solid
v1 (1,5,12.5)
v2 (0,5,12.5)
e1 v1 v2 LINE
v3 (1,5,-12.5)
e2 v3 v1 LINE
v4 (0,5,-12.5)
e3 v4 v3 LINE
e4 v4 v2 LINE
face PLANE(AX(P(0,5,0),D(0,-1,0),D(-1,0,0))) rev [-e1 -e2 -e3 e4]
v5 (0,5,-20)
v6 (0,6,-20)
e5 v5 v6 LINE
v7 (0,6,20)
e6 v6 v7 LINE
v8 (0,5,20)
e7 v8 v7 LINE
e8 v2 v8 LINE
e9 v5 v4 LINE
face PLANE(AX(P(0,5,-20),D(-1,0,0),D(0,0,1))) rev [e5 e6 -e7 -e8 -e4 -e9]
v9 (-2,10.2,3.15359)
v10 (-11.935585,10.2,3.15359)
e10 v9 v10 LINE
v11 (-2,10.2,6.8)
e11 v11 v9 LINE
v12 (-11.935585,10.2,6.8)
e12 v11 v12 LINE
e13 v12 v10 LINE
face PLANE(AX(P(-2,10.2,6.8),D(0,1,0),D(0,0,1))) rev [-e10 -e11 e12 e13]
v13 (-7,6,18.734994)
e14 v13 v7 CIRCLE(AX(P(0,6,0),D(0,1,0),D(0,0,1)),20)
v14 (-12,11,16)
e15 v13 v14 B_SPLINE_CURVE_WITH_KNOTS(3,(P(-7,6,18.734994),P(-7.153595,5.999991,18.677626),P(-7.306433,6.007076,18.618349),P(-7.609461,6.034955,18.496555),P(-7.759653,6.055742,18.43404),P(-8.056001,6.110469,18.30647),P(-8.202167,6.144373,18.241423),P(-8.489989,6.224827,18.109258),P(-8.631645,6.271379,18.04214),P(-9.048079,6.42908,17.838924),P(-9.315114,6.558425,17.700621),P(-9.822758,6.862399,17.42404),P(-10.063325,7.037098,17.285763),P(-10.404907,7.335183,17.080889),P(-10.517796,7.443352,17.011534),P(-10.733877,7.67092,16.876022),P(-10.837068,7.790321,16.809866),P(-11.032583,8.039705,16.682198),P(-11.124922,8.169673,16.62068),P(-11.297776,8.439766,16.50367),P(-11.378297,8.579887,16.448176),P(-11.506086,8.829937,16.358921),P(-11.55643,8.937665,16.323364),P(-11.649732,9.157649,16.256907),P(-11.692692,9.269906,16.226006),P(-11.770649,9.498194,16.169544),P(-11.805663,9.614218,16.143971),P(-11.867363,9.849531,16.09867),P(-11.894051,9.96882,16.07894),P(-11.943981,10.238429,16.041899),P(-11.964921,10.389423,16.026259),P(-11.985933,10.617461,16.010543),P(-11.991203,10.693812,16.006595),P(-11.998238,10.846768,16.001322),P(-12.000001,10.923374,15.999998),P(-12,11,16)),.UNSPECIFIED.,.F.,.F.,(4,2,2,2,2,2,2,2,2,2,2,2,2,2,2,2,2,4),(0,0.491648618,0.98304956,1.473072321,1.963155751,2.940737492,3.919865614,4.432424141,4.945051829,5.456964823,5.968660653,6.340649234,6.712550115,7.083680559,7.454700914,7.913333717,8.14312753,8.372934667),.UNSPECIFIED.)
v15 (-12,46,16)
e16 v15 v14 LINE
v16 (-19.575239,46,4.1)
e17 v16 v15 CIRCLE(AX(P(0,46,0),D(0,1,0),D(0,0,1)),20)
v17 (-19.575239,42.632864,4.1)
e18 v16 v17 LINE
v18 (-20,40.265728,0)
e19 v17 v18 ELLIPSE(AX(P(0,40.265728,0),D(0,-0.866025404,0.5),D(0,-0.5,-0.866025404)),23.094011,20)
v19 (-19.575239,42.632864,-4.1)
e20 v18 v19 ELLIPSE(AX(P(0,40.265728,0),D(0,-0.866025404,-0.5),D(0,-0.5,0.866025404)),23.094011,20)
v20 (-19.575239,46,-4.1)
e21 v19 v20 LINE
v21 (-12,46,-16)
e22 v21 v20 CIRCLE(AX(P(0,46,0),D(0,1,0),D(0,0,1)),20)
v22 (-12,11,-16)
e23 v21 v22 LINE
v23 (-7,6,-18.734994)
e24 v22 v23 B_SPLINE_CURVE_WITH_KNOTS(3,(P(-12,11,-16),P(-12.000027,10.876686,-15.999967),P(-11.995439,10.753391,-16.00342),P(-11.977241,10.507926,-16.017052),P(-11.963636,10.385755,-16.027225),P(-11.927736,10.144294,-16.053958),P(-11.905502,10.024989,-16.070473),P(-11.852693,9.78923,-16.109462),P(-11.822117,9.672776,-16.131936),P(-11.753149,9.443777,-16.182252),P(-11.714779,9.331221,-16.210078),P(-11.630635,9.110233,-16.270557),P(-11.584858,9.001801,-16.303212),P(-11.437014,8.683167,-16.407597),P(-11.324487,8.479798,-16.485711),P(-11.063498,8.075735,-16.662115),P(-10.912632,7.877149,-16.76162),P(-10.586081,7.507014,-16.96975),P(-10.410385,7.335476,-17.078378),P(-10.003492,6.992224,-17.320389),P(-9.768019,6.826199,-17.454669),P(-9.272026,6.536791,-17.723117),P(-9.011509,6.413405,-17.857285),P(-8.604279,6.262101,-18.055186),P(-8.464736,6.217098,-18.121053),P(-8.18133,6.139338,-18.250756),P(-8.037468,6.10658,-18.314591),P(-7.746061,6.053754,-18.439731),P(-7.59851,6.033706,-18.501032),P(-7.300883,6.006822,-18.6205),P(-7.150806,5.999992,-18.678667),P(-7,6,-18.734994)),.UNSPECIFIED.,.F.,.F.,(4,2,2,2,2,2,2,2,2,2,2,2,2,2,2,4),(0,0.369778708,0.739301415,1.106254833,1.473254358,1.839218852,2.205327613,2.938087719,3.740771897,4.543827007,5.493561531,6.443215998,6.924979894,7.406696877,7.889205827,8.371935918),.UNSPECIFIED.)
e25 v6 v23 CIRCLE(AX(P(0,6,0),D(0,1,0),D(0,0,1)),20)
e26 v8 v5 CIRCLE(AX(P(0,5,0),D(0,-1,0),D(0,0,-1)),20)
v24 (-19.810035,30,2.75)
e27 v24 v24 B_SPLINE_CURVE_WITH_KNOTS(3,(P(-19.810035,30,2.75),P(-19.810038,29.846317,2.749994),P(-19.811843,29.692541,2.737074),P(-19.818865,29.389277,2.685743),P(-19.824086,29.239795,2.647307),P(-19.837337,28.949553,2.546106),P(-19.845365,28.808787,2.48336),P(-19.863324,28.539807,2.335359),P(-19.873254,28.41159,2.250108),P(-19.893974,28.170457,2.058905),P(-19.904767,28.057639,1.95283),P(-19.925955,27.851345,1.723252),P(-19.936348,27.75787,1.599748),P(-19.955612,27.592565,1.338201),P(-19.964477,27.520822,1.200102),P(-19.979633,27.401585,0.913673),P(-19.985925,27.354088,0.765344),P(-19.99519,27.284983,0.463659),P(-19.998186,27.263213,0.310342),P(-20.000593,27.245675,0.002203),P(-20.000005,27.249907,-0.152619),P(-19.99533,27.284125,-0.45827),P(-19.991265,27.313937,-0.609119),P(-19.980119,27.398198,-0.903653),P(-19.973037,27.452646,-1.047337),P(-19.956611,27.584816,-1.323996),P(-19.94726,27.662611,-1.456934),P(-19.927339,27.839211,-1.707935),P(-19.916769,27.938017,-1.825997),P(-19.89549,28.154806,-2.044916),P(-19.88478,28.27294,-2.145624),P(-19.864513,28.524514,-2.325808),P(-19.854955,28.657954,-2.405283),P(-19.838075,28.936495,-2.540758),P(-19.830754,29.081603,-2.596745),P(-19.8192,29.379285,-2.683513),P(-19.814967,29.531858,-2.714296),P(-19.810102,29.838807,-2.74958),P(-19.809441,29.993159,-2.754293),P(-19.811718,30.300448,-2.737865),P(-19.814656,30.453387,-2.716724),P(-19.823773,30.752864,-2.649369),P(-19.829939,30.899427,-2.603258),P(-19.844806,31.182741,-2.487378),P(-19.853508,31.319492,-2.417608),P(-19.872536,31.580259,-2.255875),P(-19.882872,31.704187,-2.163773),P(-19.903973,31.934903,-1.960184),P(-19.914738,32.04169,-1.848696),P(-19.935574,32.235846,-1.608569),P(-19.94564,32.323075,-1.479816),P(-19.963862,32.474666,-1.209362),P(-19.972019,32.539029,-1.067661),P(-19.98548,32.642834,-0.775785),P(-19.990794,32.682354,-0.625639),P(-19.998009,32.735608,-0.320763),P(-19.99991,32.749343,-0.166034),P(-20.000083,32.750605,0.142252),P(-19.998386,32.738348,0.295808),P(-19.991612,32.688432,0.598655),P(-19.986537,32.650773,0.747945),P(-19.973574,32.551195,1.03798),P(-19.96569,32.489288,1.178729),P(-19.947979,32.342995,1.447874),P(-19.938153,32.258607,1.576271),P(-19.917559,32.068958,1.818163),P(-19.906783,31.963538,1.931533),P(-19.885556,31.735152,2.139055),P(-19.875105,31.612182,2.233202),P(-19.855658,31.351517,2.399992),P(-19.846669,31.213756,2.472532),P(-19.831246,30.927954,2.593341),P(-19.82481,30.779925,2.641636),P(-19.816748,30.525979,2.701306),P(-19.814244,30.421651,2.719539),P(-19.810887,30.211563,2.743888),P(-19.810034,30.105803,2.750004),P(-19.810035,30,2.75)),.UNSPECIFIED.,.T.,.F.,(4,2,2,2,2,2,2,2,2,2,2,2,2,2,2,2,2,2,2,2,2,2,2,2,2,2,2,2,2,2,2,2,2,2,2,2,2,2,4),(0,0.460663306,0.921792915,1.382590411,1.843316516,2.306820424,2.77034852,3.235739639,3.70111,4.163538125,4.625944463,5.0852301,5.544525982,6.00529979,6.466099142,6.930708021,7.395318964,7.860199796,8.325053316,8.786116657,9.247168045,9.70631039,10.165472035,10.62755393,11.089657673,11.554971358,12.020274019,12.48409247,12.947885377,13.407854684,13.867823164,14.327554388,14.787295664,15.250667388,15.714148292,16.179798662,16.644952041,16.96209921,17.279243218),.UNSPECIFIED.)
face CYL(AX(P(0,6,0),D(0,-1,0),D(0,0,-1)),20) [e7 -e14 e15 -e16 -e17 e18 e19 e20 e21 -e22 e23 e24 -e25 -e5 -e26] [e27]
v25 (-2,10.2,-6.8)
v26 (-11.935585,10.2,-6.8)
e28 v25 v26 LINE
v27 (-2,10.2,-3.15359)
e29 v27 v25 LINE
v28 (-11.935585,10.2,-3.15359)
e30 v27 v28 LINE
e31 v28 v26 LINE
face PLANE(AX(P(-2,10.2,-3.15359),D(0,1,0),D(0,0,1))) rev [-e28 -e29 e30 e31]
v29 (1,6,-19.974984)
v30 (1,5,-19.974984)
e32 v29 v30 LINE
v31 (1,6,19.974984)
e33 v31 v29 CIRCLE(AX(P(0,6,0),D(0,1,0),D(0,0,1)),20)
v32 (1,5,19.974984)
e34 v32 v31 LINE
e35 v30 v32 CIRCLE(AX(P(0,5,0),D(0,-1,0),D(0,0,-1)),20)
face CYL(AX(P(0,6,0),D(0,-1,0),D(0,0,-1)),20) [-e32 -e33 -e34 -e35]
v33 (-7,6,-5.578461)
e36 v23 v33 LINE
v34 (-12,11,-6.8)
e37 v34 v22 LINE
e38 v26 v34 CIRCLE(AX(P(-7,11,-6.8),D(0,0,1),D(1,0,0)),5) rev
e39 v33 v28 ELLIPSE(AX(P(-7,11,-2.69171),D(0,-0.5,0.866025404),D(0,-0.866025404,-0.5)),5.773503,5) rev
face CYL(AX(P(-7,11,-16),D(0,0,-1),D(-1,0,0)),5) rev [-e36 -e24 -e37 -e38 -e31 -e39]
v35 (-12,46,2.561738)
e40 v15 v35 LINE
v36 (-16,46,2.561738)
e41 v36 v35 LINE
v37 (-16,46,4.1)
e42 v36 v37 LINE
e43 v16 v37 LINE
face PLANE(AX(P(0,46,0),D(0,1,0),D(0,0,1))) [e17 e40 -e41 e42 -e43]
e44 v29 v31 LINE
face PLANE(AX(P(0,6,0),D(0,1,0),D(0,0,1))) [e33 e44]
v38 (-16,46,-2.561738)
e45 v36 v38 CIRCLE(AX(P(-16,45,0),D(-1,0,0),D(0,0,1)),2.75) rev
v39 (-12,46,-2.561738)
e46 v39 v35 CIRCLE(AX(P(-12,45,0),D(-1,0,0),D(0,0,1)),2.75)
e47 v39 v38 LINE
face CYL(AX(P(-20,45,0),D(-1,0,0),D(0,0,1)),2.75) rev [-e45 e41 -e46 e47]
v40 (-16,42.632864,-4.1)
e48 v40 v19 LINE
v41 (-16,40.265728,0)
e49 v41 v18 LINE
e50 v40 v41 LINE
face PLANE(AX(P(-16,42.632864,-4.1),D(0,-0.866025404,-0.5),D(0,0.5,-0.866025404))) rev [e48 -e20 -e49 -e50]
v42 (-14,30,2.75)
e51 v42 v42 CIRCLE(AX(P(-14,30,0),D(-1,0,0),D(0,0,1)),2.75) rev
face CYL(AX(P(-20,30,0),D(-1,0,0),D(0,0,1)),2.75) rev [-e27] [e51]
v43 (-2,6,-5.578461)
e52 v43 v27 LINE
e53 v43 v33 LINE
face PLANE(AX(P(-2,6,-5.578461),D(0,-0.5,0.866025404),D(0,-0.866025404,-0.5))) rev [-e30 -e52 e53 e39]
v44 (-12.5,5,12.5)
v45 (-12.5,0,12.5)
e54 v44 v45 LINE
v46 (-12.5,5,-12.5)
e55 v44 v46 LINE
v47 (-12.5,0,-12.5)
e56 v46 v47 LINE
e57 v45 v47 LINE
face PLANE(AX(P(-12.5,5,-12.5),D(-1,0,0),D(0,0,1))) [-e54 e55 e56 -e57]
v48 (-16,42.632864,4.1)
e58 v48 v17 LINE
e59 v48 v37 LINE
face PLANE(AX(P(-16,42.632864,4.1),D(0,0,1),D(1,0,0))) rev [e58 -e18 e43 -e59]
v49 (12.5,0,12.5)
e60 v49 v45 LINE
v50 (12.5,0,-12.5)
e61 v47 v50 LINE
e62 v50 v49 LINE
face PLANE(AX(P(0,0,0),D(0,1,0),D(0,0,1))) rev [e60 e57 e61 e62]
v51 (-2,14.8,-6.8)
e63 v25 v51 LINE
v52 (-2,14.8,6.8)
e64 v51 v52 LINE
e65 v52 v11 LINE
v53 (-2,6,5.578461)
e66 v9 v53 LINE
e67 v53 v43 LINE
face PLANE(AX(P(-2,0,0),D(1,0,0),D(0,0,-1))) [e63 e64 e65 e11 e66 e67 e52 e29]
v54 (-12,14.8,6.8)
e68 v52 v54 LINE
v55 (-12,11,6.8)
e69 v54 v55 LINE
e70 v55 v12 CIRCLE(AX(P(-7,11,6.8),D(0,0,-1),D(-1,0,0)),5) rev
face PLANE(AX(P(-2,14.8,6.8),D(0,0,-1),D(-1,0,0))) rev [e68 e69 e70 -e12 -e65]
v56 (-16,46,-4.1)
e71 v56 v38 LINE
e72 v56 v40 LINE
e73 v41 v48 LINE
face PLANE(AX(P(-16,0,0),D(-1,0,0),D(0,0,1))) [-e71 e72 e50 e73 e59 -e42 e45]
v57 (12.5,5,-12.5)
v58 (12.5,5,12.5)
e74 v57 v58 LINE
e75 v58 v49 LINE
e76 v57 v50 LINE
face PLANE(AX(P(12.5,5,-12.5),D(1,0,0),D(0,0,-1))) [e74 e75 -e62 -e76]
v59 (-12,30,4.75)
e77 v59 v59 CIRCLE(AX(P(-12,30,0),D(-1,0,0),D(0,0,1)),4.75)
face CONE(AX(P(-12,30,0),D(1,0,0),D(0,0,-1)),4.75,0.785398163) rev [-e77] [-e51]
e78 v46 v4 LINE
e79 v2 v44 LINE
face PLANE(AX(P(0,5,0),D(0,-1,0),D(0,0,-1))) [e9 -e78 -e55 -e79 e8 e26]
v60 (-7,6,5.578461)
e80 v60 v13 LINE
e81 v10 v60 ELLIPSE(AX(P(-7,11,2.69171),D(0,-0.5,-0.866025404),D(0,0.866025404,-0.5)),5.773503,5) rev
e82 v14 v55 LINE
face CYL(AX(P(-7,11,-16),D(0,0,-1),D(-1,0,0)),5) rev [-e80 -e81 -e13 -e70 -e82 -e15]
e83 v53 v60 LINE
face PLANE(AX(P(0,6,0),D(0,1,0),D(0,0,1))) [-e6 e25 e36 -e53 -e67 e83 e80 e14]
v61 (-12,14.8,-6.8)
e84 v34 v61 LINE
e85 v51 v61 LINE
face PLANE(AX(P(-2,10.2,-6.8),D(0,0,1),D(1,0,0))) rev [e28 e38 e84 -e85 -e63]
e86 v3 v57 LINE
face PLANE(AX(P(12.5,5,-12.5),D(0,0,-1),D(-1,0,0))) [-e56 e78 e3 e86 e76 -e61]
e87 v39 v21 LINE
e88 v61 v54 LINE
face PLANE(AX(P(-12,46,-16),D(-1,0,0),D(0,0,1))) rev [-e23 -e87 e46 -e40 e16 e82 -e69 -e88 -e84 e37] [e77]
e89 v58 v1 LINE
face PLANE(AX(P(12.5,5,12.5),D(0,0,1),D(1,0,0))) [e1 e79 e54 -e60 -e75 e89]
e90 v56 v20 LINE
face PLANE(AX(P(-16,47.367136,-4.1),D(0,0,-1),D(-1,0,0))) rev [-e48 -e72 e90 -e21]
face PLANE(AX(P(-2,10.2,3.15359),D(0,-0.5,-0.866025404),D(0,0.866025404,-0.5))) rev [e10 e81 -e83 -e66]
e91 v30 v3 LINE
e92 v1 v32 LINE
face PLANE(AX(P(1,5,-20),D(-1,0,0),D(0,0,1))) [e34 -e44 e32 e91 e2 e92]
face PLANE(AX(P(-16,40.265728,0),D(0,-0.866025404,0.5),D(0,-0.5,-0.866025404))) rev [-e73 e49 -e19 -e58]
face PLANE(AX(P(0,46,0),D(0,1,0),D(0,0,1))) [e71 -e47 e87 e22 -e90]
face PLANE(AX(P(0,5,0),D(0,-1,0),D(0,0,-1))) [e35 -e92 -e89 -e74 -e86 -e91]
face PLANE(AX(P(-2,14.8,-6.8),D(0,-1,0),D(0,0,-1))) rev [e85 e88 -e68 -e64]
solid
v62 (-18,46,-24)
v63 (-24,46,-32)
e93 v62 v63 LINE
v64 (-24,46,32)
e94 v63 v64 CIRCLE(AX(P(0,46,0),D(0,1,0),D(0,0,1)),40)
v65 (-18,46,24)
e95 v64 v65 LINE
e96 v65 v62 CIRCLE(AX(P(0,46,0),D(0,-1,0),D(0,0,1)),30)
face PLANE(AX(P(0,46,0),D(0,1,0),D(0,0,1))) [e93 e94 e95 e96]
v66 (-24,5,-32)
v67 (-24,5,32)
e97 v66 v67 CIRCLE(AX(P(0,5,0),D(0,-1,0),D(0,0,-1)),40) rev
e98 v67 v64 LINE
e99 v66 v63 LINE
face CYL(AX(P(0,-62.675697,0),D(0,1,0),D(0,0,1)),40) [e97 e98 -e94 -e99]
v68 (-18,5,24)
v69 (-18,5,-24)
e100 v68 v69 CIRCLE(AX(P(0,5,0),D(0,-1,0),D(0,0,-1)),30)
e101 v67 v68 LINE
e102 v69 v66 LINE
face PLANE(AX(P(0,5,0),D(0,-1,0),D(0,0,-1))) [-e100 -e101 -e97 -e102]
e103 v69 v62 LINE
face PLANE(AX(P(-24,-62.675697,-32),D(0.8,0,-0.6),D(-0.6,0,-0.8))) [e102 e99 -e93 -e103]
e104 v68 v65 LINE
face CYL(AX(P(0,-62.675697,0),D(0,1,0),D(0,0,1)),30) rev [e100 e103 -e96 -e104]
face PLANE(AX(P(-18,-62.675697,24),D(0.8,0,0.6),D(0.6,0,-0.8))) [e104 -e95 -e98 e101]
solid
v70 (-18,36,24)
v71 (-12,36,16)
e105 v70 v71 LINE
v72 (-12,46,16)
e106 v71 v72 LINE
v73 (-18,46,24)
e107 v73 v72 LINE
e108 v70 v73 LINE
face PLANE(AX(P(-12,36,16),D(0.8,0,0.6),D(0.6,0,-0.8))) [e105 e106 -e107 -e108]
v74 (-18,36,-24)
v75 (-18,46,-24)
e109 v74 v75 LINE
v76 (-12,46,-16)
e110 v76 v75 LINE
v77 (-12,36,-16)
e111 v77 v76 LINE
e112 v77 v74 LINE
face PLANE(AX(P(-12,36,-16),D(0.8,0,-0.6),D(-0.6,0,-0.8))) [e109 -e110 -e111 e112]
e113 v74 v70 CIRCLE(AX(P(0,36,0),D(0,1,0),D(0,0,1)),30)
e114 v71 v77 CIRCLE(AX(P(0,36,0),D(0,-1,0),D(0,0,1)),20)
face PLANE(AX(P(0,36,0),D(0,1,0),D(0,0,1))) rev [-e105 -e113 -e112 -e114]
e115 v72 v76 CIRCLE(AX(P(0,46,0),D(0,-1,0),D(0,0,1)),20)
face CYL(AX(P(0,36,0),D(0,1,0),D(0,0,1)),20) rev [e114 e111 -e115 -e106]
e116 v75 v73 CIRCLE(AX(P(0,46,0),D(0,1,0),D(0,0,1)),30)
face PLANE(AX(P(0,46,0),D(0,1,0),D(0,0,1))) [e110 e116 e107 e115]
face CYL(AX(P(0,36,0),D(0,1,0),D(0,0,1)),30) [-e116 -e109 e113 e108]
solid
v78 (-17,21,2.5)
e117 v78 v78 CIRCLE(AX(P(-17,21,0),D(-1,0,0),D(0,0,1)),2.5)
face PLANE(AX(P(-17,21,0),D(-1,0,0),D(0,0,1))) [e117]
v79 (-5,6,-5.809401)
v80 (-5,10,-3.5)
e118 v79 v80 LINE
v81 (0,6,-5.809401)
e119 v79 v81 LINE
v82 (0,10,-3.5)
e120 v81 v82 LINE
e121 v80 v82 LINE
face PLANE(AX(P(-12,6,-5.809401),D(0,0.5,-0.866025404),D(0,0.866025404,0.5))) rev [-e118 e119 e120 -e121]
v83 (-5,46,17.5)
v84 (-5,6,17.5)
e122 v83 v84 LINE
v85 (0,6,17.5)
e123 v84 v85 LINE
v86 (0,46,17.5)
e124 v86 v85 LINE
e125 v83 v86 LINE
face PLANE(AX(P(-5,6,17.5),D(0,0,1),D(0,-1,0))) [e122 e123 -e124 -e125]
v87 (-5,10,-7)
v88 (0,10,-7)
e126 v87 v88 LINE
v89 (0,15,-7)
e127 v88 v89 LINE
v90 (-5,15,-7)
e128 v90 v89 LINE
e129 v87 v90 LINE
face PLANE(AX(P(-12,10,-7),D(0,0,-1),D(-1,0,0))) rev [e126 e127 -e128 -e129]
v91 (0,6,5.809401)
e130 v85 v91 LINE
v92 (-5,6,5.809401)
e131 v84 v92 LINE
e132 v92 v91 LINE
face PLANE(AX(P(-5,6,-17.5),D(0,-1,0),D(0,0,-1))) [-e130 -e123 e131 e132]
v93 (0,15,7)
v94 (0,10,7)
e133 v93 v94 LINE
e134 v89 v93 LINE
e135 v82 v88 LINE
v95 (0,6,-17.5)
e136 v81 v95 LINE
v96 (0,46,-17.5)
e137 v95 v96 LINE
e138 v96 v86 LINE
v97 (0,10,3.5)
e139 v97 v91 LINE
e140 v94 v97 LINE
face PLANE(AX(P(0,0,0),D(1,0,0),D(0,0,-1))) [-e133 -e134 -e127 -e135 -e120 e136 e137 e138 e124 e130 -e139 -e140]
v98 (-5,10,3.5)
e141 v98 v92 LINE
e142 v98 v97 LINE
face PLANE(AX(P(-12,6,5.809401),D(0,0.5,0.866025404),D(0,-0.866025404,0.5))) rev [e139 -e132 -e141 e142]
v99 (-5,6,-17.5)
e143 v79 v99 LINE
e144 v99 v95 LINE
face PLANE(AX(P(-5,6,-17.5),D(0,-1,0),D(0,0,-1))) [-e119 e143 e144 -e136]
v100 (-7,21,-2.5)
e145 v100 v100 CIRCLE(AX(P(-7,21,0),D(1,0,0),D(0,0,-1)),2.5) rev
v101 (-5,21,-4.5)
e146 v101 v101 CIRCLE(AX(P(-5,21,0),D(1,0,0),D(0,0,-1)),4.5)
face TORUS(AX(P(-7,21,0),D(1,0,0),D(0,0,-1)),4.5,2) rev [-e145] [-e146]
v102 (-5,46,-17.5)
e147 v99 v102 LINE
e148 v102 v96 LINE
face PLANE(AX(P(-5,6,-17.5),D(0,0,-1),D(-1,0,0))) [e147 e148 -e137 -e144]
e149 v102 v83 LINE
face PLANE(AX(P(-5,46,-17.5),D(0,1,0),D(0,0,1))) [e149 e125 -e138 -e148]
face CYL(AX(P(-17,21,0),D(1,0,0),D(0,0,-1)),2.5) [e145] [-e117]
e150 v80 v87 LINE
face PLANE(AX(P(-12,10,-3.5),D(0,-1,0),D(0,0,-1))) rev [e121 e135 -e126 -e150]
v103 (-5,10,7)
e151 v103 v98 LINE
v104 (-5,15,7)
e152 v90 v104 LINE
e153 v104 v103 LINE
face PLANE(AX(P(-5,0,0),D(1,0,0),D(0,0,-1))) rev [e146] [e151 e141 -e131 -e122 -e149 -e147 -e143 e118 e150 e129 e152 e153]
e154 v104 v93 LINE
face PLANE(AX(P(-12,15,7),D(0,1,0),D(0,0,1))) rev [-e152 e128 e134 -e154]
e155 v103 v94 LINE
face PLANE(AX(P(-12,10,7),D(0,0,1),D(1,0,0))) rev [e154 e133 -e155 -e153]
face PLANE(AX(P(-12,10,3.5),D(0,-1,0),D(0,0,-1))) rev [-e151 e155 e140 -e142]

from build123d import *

# Parameters (mm, degrees)
SCHIZZO1_R                       = 20
ESTRUSIONE_ESTRUSIONE1_DEPTH     = 6
ESTRUSIONE_ESTRUSIONE2_DEPTH     = 40
RACCORDO1_R                      = 5
FORO_PER_VITE_M5_1_D             = 5.5
FORO_PER_VITE_M5_1_DEPTH         = 14
FORO_PER_VITE_M5_1_TIP           = 1.652366702
TAGLIO_ESTRUSIONE1_DEPTH         = 4
SCHIZZO9_W                       = 35
SCHIZZO9_H                       = 40
ESTRUSIONE_ESTRUSIONE3_DEPTH     = 5
SCHIZZO10_R                      = 2.5
ESTRUSIONE_ESTRUSIONE4_DEPTH     = 12
TAGLIO_ESTRUSIONE2_DEPTH         = 12
ESTRUSIONE_ESTRUSIONE5_DEPTH     = 10
SCHIZZO13_W                      = 1
SCHIZZO13_H                      = 40
TAGLIO_ESTRUSIONE_SOTTILE1_DEPTH = 1
SCHIZZO17_OUTSIDE_W              = 56.582
SCHIZZO17_OUTSIDE_H              = 56.582
SCHIZZO17_OUTSIDE_W_2            = 25
SCHIZZO17_OUTSIDE_H_2            = 25
TAGLIO_ESTRUSIONE3_DEPTH         = 5
RACCORDO2_R                      = 2
SMUSSO1_SIZE                     = 2
BOSS_EXTRUDE1_DEPTH              = 41
BOSS_EXTRUDE2_DEPTH              = 10


with BuildPart() as part:
    # Schizzo1 → Estrusione-Estrusione1 (new body)
    with BuildSketch(Plane(origin=(0, 0, 0), x_dir=(1, 0, 0), z_dir=(0, 1, 0))):
        with Locations(Location((0, 0, 0), (0, 0, 270))):
            Circle(SCHIZZO1_R)
    extrude(amount=ESTRUSIONE_ESTRUSIONE1_DEPTH)

    # Schizzo2 → Estrusione-Estrusione2 (add)
    with BuildSketch(Plane(origin=(0, 6, 0), x_dir=(1, 0, 0), z_dir=(0, 1, 0))):
        with BuildLine():
            Line((-12, 16), (-12, -16))
            ThreePointArc((-12, -16), (-20, 0), (-12, 16))
        make_face()
    extrude(amount=ESTRUSIONE_ESTRUSIONE2_DEPTH)

    # Raccordo1
    # the kernel refuses this fillet: 5 mm, written as the material it adds along each edge
    with BuildSketch(Plane(origin=(-12, 6, -28.5), x_dir=(1, 0, 0), z_dir=(0, 0, 1))) as raccordo1_piece_1_section:
        with BuildLine():
            CenterArc((RACCORDO1_R, RACCORDO1_R), RACCORDO1_R, 180, 90)
            Line((0, RACCORDO1_R), (0, 0))
            Line((0, 0), (RACCORDO1_R, 0))
        make_face()
    raccordo1_piece_1 = extrude(amount=57, mode=Mode.PRIVATE)
    raccordo1_piece_1 = raccordo1_piece_1 & Plane(origin=(0, 7.106421828, 0), x_dir=(0, 0, 1), z_dir=(0, -1, 0)) * Cylinder(20, 134, mode=Mode.PRIVATE)
    add(raccordo1_piece_1)

    # Foro per Vite M5-1
    with Locations(Plane.ZY.offset(20)):
        with Locations((0, 30), (0, 45)):
            Hole(FORO_PER_VITE_M5_1_D / 2, depth=FORO_PER_VITE_M5_1_DEPTH)
            with Locations((0, 0, -(FORO_PER_VITE_M5_1_DEPTH + FORO_PER_VITE_M5_1_TIP / 2))):  # 118° drill point
                Cone(0, FORO_PER_VITE_M5_1_D / 2, FORO_PER_VITE_M5_1_TIP, mode=Mode.SUBTRACT)

    # Schizzo8 → Taglio-Estrusione1 (cut)
    with BuildSketch(Plane.ZY.offset(20)):
        Polygon((0, 49.734272207), (-4.1, 47.367136104), (-4.1, 42.632863896), (0, 40.265727793), (4.1, 42.632863896), (4.1, 47.367136104), align=None)
    extrude(amount=-TAGLIO_ESTRUSIONE1_DEPTH, mode=Mode.SUBTRACT)

    # Schizzo12 → Estrusione-Estrusione5 (add)
    with BuildSketch(Plane(origin=(-12, 0, 0), x_dir=(0, 0, -1), z_dir=(1, 0, 0))):
        Polygon((5.578460969, 6), (3.153589838, 10.2), (6.8, 10.2), (6.8, 14.8), (-6.8, 14.8), (-6.8, 10.2), (-3.153589838, 10.2), (-5.578460969, 6), align=None)
    extrude(amount=ESTRUSIONE_ESTRUSIONE5_DEPTH)

    # Schizzo13 → Taglio-Estrusione-Sottile1 (cut)
    with BuildSketch(Plane(origin=(0, 6, 0), x_dir=(1, 0, 0), z_dir=(0, 1, 0))):
        with Locations((0.5, 0)):
            Rectangle(SCHIZZO13_W, SCHIZZO13_H)
    extrude(amount=-TAGLIO_ESTRUSIONE_SOTTILE1_DEPTH, mode=Mode.SUBTRACT)

    # Schizzo17 outside → Taglio-Estrusione3 (cut)
    with BuildSketch(Plane.XZ):
        Rectangle(SCHIZZO17_OUTSIDE_W, SCHIZZO17_OUTSIDE_H)
        Rectangle(SCHIZZO17_OUTSIDE_W_2, SCHIZZO17_OUTSIDE_H_2, mode=Mode.SUBTRACT)
    extrude(amount=-TAGLIO_ESTRUSIONE3_DEPTH, mode=Mode.SUBTRACT)

    # Smusso1
    smusso1_edges = [part.edges().sort_by_distance(p)[0] for p in [
        (-12, 30, 2.75),
    ]]
    chamfer(smusso1_edges, length=SMUSSO1_SIZE)


with BuildPart() as body_2:
    # Schizzo9 → Estrusione-Estrusione3 (new body)
    with BuildSketch(Plane(origin=(0, 0, 0), x_dir=(0, 0, -1), z_dir=(1, 0, 0))):
        with Locations((0, 26)):
            Rectangle(SCHIZZO9_W, SCHIZZO9_H)
    extrude(amount=-ESTRUSIONE_ESTRUSIONE3_DEPTH)

    # Schizzo10 → Estrusione-Estrusione4 (add)
    with BuildSketch(Plane.ZY.offset(5)):
        with Locations(Location((0, 21, 0), (0, 0, 180))):
            Circle(SCHIZZO10_R)
    extrude(amount=ESTRUSIONE_ESTRUSIONE4_DEPTH)

    # Schizzo11 → Taglio-Estrusione2 (cut)
    with BuildSketch(Plane(origin=(0, 0, 0), x_dir=(0, 0, -1), z_dir=(1, 0, 0))):
        Polygon((-5.809401077, 6), (-3.5, 10), (-7, 10), (-7, 15), (7, 15), (7, 10), (3.5, 10), (5.809401077, 6), align=None)
    extrude(amount=-TAGLIO_ESTRUSIONE2_DEPTH, mode=Mode.SUBTRACT)

    # Raccordo2
    raccordo2_edges = [body_2.edges().sort_by_distance(p)[0] for p in [
        (-5, 21, 2.5),
    ]]
    fillet(raccordo2_edges, radius=RACCORDO2_R)


with BuildPart() as body_3:
    # Sketch1 → Boss-Extrude1 (new body)
    with BuildSketch(Plane(origin=(0, 46, 0), x_dir=(1, 0, 0), z_dir=(0, 1, 0))):
        with BuildLine():
            Line((-24, 32), (-18, 24))
            ThreePointArc((-18, 24), (-30, 0), (-18, -24))
            Line((-18, -24), (-24, -32))
            ThreePointArc((-24, -32), (-40, 0), (-24, 32))
        make_face()
    extrude(amount=-BOSS_EXTRUDE1_DEPTH)


with BuildPart() as body_4:
    # Sketch2 → Boss-Extrude2 (new body)
    with BuildSketch(Plane(origin=(0, 46, 0), x_dir=(1, 0, 0), z_dir=(0, 1, 0))):
        with BuildLine():
            Line((-12, 16), (-18, 24))
            ThreePointArc((-18, 24), (-30, 0), (-18, -24))
            Line((-18, -24), (-12, -16))
            ThreePointArc((-12, -16), (-20, 0), (-12, 16))
        make_face()
    extrude(amount=-BOSS_EXTRUDE2_DEPTH)


solid = Compound([part.part, body_2.part, body_3.part, body_4.part])
